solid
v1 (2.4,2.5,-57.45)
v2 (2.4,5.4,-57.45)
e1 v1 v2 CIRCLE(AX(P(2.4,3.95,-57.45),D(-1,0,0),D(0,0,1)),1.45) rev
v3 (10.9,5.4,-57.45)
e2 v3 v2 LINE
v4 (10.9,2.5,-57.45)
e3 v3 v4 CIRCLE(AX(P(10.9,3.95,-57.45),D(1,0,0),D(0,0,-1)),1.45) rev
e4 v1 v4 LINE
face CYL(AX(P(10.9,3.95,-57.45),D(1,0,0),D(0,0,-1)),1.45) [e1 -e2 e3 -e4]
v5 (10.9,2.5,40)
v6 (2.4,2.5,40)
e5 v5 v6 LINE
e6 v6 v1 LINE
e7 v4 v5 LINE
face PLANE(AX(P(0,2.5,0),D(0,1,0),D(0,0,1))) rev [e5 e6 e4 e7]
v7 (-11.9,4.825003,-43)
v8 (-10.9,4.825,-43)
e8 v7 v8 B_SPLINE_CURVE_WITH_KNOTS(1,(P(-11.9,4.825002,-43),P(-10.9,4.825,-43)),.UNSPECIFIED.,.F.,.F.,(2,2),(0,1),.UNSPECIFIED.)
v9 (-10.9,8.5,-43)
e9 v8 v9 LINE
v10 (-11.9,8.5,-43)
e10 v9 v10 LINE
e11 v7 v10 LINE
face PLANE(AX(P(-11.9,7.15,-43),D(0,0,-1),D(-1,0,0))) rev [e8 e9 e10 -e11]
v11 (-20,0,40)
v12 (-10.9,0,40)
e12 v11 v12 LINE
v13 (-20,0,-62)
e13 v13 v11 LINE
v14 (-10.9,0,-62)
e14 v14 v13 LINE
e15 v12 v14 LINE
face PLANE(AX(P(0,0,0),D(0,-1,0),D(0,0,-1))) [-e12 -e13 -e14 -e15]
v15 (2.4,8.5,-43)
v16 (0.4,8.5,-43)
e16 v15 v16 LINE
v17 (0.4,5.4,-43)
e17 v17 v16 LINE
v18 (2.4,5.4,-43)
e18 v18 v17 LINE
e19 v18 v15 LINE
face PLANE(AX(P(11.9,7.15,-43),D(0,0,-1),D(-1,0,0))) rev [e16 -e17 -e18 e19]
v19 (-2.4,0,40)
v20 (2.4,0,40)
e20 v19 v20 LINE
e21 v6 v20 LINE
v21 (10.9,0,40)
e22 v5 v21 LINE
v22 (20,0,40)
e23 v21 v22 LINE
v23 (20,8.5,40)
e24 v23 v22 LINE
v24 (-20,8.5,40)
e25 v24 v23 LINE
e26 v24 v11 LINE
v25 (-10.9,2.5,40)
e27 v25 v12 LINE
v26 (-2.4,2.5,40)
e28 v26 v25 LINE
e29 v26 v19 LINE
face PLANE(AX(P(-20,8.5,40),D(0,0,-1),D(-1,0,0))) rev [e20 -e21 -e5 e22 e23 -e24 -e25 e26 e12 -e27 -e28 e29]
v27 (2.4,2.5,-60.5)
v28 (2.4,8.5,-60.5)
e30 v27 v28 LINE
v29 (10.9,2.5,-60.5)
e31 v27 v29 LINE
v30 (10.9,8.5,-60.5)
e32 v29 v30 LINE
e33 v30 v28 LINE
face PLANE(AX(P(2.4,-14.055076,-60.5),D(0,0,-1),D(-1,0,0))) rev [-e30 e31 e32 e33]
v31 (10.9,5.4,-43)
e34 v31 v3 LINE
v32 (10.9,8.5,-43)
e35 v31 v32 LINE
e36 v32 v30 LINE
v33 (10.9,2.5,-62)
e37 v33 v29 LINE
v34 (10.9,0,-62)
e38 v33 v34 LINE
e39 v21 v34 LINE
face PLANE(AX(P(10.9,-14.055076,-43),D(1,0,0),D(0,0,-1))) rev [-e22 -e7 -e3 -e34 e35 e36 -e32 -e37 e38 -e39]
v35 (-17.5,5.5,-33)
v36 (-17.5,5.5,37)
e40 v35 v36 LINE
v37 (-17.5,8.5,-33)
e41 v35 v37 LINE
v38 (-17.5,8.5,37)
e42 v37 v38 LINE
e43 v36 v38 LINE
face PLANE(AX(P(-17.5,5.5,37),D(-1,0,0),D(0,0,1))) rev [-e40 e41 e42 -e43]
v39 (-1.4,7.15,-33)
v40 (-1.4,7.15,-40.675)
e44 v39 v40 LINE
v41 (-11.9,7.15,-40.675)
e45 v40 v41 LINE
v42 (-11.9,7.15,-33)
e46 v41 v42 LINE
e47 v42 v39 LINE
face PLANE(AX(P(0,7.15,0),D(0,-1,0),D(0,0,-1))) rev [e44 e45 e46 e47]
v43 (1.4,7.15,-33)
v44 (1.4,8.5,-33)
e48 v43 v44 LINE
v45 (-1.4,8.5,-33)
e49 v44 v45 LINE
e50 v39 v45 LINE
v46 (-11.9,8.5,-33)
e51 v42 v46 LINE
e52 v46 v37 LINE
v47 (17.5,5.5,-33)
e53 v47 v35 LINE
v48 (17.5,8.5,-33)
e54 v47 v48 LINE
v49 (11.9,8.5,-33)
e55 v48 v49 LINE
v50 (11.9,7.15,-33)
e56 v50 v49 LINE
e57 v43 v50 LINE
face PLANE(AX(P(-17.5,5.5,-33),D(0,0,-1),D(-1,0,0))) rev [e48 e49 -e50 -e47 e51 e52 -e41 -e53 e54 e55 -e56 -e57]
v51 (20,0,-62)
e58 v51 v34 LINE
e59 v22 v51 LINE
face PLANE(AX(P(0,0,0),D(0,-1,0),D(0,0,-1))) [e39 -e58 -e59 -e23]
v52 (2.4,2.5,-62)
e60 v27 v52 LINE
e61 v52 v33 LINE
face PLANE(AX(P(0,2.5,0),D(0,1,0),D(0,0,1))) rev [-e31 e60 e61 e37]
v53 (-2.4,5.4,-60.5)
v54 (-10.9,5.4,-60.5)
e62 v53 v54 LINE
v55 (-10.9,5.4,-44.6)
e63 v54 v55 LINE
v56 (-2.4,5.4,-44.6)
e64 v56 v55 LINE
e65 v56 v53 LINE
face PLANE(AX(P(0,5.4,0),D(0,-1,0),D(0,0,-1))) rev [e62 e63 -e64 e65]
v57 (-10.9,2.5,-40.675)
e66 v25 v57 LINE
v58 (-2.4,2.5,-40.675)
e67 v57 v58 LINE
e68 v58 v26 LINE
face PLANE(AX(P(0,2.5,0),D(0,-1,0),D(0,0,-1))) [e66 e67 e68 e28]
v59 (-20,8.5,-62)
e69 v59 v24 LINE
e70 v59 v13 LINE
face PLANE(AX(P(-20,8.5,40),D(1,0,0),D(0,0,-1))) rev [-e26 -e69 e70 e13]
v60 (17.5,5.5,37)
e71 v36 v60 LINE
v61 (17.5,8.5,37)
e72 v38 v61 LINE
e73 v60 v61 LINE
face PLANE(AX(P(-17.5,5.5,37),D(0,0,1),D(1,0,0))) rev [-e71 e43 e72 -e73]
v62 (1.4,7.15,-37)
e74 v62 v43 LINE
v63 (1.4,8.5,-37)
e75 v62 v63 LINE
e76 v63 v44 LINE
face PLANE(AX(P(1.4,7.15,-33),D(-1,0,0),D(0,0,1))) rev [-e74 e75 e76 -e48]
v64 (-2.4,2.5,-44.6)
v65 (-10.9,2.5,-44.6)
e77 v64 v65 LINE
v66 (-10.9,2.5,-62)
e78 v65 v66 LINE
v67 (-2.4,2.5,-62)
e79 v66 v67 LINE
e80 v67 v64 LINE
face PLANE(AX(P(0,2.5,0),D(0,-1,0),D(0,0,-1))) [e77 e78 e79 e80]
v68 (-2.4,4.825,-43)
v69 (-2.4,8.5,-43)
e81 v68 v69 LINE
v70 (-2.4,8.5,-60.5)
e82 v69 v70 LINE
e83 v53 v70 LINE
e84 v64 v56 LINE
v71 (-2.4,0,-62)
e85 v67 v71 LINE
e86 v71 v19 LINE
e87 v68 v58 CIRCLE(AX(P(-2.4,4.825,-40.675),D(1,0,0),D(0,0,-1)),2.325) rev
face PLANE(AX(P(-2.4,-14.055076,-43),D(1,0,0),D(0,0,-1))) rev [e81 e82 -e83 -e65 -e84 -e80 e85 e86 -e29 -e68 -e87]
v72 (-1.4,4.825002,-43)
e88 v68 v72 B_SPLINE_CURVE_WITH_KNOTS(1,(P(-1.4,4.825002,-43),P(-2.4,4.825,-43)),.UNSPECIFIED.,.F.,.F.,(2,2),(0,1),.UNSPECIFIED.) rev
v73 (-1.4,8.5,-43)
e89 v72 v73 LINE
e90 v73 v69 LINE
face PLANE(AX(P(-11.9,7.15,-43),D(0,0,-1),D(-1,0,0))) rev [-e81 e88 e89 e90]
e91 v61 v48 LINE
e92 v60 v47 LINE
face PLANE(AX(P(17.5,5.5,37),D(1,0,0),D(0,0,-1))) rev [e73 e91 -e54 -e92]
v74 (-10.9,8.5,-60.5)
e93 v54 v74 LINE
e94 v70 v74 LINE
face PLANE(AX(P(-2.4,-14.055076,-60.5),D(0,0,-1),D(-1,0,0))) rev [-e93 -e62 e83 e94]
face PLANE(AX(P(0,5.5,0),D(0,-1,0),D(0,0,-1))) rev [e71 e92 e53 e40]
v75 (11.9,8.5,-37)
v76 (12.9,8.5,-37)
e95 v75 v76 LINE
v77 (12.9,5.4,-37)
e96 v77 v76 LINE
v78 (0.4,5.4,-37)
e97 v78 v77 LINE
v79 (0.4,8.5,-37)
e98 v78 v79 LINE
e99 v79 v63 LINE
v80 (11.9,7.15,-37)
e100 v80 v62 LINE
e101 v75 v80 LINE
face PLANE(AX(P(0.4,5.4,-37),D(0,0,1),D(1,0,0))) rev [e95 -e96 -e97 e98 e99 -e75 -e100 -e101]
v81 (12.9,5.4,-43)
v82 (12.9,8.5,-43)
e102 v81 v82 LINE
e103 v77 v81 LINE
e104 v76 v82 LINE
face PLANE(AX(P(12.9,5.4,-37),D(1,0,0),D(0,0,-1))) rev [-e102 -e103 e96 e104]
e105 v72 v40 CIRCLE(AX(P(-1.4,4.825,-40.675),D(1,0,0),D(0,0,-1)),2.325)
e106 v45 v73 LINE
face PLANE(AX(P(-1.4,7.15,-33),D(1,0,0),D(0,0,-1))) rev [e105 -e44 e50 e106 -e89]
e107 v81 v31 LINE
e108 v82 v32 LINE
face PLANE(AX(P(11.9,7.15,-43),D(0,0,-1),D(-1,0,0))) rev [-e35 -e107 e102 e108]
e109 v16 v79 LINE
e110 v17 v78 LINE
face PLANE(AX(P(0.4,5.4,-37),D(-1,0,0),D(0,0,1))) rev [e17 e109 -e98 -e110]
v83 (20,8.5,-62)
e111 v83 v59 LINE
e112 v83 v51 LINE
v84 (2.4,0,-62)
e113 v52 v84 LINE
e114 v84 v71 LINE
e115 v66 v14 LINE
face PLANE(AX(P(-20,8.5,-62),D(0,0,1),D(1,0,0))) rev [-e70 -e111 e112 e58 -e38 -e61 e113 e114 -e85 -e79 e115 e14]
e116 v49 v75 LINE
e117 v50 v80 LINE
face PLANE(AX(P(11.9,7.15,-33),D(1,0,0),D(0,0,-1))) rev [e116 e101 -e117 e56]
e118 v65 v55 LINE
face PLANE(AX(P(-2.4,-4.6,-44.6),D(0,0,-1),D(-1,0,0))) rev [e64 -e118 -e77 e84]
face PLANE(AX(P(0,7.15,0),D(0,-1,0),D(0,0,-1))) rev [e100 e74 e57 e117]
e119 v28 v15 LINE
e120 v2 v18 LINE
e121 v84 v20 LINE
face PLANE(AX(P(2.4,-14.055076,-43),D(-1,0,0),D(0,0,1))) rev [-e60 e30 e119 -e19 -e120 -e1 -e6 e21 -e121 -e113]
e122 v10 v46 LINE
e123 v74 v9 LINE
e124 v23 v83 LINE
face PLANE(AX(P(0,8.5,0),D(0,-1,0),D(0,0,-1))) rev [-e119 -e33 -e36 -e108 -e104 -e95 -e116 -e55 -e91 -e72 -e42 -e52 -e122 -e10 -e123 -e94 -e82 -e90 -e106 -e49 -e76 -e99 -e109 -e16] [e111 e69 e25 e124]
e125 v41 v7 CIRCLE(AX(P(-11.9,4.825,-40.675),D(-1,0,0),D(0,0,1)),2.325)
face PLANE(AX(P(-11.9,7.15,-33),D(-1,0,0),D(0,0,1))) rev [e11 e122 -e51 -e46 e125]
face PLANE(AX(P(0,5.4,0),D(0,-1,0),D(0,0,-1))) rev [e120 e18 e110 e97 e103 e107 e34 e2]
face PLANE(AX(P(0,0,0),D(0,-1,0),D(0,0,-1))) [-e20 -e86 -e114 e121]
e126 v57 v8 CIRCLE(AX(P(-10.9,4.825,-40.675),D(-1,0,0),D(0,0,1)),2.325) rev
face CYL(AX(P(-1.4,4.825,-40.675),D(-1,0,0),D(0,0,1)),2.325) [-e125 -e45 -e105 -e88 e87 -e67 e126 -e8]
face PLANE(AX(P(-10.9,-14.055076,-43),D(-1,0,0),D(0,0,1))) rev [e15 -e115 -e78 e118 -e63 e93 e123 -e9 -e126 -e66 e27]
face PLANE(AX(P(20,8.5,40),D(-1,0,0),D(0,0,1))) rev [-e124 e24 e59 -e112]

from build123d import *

# Parameters (mm, degrees)
SKETCH1_W               = 40
SKETCH1_H               = 102
BOSS_EXTRUDE1_DEPTH     = 8.5
SKETCH2_W               = 35
SKETCH2_H               = 70
CUT_EXTRUDE1_DEPTH      = 3
SKETCH3_W               = 10.5
SKETCH3_H               = 10
CUT_EXTRUDE2_DEPTH      = 1.35
SKETCH4_W               = 12.5
SKETCH4_H               = 6
CUT_EXTRUDE3_DEPTH      = 3.1
SKETCH5_W               = 8.5
SKETCH5_H               = 17.5
PCB_PLACE_DEPTH         = 3.1
SKETCH6_W               = 8.5
SKETCH6_H               = 1.6
NICKEL_STRIP_HOLE_DEPTH = 66.369411807
CUT_EXTRUDE4_REACH      = 67.698
SKETCH7_W               = 8.5
SKETCH7_H               = 17.5
SKETCH8_W               = 8.5
SKETCH8_H               = 1.6
CUT_EXTRUDE5_DEPTH      = 10
SKETCH9_W               = 8.5
SKETCH9_H               = 102
NICKEL_STRIP_RAIL_DEPTH = 2.5
FILLET3_R               = 2.325
FILLET4_RADIUS          = 1.45
FILLET4_LENGTH          = 8.5


with BuildPart() as part:
    # Sketch1 → Boss-Extrude1 (new body)
    with BuildSketch(Plane(origin=(0, 0, 0), x_dir=(1, 0, 0), z_dir=(0, 1, 0))):
        with Locations((0, 11)):
            Rectangle(SKETCH1_W, SKETCH1_H)
    extrude(amount=BOSS_EXTRUDE1_DEPTH)

    # Sketch2 → Cut-Extrude1 (cut)
    with BuildSketch(Plane(origin=(0, 8.5, 0), x_dir=(1, 0, 0), z_dir=(0, 1, 0))):
        with Locations((0, -2)):
            Rectangle(SKETCH2_W, SKETCH2_H)
    extrude(amount=-CUT_EXTRUDE1_DEPTH, mode=Mode.SUBTRACT)

    # Sketch3 → Cut-Extrude2 (cut)
    with BuildSketch(Plane(origin=(0, 8.5, 0), x_dir=(1, 0, 0), z_dir=(0, 1, 0))):
        with Locations((-6.65, 38)):
            Rectangle(SKETCH3_W, SKETCH3_H)
        with Locations((6.65, 38)):
            Rectangle(SKETCH3_W, SKETCH3_H)
    extrude(amount=-CUT_EXTRUDE2_DEPTH, mode=Mode.SUBTRACT)

    # Sketch4 → Cut-Extrude3 (cut)
    with BuildSketch(Plane(origin=(0, 8.5, 0), x_dir=(1, 0, 0), z_dir=(0, 1, 0))):
        with Locations((6.65, 40)):
            Rectangle(SKETCH4_W, SKETCH4_H)
    extrude(amount=-CUT_EXTRUDE3_DEPTH, mode=Mode.SUBTRACT)

    # Sketch5 → PCB place (cut)
    with BuildSketch(Plane(origin=(0, 8.5, 0), x_dir=(1, 0, 0), z_dir=(0, 1, 0))):
        with Locations((6.65, 51.75)):
            Rectangle(SKETCH5_W, SKETCH5_H)
    extrude(amount=-PCB_PLACE_DEPTH, mode=Mode.SUBTRACT)

    # Sketch6 → Nickel strip hole (cut, through all)
    with BuildSketch(Plane(origin=(0, 5.4, 0), x_dir=(1, 0, 0), z_dir=(0, 1, 0))):
        with Locations((6.65, 59.7)):
            Rectangle(SKETCH6_W, SKETCH6_H)
    extrude(amount=-NICKEL_STRIP_HOLE_DEPTH, mode=Mode.SUBTRACT)

    # Cut-Extrude4: up to this face of the body (flat: up to its plane)
    cut_extrude4_end = Plane(part.part.faces().sort_by_distance((6.65, 5.4, -47.042077088))[0])
    # Sketch7 → Cut-Extrude4 (cut, up to the picked face)
    with BuildSketch(Plane(origin=(0, 8.5, 0), x_dir=(1, 0, 0), z_dir=(0, 1, 0)), mode=Mode.PRIVATE) as cut_extrude4_sk1:
        with Locations((-6.65, 51.75)):
            Rectangle(SKETCH7_W, SKETCH7_H)
    cut_extrude4_tool1 = split(extrude(cut_extrude4_sk1.sketch, amount=-CUT_EXTRUDE4_REACH, mode=Mode.PRIVATE), bisect_by=cut_extrude4_end, keep=Keep.BOTH, mode=Mode.PRIVATE)
    add(cut_extrude4_tool1.solids().sort_by(Axis((-6.65, 8.5, -51.75), (0, -1, 0)))[0], mode=Mode.SUBTRACT)

    # Sketch8 → Cut-Extrude5 (cut)
    with BuildSketch(Plane(origin=(0, 5.4, 0), x_dir=(1, 0, 0), z_dir=(0, 1, 0))):
        with Locations((-6.65, 43.8)):
            Rectangle(SKETCH8_W, SKETCH8_H)
    extrude(amount=-CUT_EXTRUDE5_DEPTH, mode=Mode.SUBTRACT)

    # Sketch9 → Nickel strip rail (cut)
    with BuildSketch(Plane.XZ):
        with Locations((-6.65, -11)):
            Rectangle(SKETCH9_W, SKETCH9_H)
        with Locations((6.65, -11)):
            Rectangle(SKETCH9_W, SKETCH9_H)
    extrude(amount=-NICKEL_STRIP_RAIL_DEPTH, mode=Mode.SUBTRACT)

    # Fillet3
    # the kernel refuses this fillet: 2.325 mm, written as the material it takes off along each edge
    with BuildSketch(Plane(origin=(3.4125, 7.15, -43), x_dir=(0, 0, 1), z_dir=(-1, 0, 0))) as fillet3_piece_1_section:
        with BuildLine():
            CenterArc((FILLET3_R, -FILLET3_R), FILLET3_R, 90, 90)
            Line((0, -FILLET3_R), (0, 0))
            Line((0, 0), (FILLET3_R, 0))
        make_face()
    fillet3_piece_1 = extrude(amount=20.125, mode=Mode.PRIVATE)
    fillet3_piece_1 = split(fillet3_piece_1, bisect_by=Plane(origin=(-11.9, 6.647157341, -42.474696814), z_dir=(1, 0, 0)), keep=Keep.TOP, mode=Mode.PRIVATE)
    fillet3_piece_1 = split(fillet3_piece_1, bisect_by=Plane(origin=(-1.4, 6.647157341, -42.474696814), z_dir=(-1, 0, 0)), keep=Keep.TOP, mode=Mode.PRIVATE)
    add(fillet3_piece_1, mode=Mode.SUBTRACT)
    with BuildSketch(Plane(origin=(-10.9, 2.5, -43), x_dir=(0, 1, 0), z_dir=(1, 0, 0))) as fillet3_piece_2:
        with BuildLine():
            CenterArc((FILLET3_R, FILLET3_R), FILLET3_R, 180, 90)
            Line((0, FILLET3_R), (0, 0))
            Line((0, 0), (FILLET3_R, 0))
        make_face()
    extrude(amount=8.5, mode=Mode.SUBTRACT)

    # Fillet4: full round fillet: the end face becomes a half cylinder, R = half its width
    fillet4_face = Plane((6.65, 3.95, -58.9), x_dir=(-1, 0, 0), z_dir=(0, 0, -1))  # on the end face: x along it, z out of the body
    fillet4_slab = fillet4_face.offset(-FILLET4_RADIUS / 2) * Box(FILLET4_LENGTH, 2 * FILLET4_RADIUS, FILLET4_RADIUS, mode=Mode.PRIVATE)  # the body's end, R deep
    fillet4_round = Plane((6.65, 3.95, -57.45), x_dir=(0, 0, -1), z_dir=(-1, 0, 0)) * Cylinder(FILLET4_RADIUS, FILLET4_LENGTH, mode=Mode.PRIVATE)  # its axis R under the face
    add(fillet4_slab - fillet4_round, mode=Mode.SUBTRACT)


solid = part.part
